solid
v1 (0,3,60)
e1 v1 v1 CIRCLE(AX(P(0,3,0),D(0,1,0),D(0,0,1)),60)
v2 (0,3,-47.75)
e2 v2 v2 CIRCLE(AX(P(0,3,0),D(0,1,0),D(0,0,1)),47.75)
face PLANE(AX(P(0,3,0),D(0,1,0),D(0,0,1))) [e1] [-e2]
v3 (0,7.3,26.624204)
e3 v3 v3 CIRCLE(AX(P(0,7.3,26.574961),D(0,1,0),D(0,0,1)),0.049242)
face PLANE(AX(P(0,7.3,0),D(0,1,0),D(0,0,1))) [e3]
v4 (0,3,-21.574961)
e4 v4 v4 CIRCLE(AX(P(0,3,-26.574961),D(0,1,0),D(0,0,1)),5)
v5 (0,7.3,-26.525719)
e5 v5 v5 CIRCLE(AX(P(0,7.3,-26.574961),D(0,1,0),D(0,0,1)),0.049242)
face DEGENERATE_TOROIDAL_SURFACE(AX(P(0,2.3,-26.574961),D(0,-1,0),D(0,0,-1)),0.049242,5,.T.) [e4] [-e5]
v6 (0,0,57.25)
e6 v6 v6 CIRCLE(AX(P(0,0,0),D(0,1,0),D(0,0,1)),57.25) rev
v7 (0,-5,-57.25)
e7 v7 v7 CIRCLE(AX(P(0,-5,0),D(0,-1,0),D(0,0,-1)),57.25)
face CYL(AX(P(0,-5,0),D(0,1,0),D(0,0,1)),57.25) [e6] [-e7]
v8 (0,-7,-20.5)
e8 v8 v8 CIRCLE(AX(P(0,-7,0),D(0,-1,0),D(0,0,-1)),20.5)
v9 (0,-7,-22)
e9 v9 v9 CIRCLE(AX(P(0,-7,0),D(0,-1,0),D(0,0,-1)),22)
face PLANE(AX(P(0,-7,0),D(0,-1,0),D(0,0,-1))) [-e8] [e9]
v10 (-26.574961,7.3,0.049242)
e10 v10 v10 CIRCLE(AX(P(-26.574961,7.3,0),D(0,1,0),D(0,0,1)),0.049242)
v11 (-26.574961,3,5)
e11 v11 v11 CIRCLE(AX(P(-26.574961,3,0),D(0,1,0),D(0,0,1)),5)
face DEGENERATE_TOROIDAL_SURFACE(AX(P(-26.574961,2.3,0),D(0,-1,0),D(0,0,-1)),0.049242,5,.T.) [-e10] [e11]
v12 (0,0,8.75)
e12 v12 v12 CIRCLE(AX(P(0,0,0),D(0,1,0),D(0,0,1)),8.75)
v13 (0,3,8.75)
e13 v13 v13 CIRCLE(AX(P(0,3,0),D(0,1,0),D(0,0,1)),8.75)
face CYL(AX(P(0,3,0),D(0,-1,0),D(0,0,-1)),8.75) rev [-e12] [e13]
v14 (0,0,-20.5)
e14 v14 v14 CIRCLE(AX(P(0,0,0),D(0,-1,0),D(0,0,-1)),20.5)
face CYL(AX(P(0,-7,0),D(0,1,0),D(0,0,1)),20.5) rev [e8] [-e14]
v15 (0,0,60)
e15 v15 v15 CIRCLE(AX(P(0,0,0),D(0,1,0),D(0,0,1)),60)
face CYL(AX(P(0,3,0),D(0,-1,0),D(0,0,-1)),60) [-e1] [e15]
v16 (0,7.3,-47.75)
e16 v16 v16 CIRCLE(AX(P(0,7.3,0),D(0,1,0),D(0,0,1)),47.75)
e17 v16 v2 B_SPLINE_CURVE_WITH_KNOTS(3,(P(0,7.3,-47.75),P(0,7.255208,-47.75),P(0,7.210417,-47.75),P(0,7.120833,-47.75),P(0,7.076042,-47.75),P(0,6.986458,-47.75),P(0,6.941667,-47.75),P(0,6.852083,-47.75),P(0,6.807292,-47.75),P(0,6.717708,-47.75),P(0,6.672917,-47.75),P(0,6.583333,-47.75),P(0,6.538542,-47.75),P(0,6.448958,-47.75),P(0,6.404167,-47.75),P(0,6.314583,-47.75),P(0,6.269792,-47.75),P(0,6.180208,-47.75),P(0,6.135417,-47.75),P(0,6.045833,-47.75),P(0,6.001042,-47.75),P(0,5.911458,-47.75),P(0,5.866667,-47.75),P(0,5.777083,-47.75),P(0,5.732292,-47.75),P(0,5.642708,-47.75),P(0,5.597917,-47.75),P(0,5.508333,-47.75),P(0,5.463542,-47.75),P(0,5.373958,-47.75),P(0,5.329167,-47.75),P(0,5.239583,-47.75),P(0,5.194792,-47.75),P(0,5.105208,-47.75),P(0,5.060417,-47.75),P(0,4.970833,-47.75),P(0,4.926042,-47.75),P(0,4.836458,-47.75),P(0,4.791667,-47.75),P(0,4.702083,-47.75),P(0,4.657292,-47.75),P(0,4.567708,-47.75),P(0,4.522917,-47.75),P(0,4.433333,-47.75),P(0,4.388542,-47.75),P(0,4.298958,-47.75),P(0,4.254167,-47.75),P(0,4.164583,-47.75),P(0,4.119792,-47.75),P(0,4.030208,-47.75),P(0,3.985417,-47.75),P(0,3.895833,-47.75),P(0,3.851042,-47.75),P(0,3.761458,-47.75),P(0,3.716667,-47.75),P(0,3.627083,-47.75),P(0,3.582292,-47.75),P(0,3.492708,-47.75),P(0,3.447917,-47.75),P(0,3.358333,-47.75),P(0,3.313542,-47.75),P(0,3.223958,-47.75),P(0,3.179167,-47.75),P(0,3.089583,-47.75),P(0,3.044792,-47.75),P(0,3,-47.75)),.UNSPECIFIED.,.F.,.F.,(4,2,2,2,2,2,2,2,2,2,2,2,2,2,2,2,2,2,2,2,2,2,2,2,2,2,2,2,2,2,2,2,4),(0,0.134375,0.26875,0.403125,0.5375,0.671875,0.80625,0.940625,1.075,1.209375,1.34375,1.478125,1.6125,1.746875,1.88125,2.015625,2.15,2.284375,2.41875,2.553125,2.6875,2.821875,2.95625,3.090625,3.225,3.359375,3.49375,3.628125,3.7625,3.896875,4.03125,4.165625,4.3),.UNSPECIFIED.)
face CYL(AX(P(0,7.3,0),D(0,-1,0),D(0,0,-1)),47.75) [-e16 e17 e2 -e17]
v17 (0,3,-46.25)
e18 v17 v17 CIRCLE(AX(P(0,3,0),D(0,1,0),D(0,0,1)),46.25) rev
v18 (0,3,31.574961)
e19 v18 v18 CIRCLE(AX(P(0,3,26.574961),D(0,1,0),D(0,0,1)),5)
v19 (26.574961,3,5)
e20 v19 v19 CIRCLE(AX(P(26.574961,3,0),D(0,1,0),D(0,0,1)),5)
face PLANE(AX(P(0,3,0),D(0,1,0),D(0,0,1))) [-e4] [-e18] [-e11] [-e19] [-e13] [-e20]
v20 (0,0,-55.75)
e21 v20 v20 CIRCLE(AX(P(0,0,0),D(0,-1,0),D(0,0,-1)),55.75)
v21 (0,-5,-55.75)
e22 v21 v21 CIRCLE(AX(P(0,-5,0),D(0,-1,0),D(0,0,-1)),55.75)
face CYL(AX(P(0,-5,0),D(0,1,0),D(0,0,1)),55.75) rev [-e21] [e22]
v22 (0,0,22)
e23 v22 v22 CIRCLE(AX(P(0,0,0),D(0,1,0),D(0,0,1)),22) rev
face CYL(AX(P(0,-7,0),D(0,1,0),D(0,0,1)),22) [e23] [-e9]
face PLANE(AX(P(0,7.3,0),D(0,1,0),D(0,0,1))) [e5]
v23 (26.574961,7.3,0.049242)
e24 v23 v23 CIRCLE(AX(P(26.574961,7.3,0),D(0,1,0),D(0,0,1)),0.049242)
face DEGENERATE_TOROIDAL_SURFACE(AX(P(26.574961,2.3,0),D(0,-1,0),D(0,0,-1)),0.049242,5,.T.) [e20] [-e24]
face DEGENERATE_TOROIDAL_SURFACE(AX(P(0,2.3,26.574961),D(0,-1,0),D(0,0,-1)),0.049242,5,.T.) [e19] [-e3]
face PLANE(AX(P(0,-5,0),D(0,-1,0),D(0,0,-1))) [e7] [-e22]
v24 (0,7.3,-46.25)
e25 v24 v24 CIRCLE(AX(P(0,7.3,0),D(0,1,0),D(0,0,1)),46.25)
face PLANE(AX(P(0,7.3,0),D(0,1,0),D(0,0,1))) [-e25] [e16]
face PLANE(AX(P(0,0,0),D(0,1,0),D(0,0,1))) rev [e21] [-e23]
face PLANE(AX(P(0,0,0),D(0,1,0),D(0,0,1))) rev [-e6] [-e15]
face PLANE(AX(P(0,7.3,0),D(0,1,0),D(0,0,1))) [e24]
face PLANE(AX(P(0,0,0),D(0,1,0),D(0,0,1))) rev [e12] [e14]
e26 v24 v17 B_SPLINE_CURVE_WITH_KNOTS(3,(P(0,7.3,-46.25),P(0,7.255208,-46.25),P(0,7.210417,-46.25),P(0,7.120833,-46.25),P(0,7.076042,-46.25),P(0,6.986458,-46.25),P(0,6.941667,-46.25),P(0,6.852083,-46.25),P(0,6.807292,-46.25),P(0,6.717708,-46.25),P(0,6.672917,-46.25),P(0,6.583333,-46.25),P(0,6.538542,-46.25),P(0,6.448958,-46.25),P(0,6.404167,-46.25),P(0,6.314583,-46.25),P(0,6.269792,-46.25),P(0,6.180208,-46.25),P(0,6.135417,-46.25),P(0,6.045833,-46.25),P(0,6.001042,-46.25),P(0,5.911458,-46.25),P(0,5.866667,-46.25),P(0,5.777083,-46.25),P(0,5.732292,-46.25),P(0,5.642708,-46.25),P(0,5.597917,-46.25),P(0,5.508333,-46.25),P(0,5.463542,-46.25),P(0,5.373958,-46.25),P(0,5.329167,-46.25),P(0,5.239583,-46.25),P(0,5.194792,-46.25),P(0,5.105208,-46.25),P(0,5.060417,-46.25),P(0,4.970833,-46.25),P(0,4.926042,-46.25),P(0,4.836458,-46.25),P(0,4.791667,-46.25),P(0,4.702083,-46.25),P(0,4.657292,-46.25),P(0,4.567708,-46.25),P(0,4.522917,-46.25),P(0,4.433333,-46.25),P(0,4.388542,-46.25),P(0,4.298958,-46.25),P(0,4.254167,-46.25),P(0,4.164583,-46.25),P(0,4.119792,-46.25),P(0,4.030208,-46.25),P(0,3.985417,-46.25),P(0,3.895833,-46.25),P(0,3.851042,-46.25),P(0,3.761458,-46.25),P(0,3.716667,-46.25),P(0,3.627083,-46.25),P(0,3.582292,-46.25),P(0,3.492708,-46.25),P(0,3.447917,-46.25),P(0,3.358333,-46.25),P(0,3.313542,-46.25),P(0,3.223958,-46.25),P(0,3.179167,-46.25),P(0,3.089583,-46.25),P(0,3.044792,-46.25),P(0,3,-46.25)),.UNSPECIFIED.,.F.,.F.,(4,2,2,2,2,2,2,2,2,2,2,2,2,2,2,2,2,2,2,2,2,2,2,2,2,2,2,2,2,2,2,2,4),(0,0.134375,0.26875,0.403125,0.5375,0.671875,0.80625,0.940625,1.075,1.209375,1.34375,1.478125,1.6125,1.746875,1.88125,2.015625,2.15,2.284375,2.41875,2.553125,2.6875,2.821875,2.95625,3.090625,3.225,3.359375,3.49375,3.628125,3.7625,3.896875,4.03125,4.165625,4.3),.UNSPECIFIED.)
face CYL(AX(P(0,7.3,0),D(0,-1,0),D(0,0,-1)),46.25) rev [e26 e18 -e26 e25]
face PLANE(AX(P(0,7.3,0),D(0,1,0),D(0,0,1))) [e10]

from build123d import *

# Parameters (mm, degrees)
SKETCH3_R           = 60
SKETCH3_R_2         = 8.75
BOSS_EXTRUDE1_DEPTH = 3
SKETCH4_R           = 57.25
SKETCH4_R_2         = 55.75
BOSS_EXTRUDE2_DEPTH = 5
SKETCH5_R           = 22
SKETCH5_R_2         = 20.5
BOSS_EXTRUDE3_DEPTH = 7
SKETCH6_R           = 47.75
SKETCH6_R_2         = 46.25
BOSS_EXTRUDE4_DEPTH = 4.3
SKETCH10_R          = 5
BOSS_EXTRUDE5_DEPTH = 4.3
FILLET2_R           = 5


with BuildPart() as part:
    # Sketch3 → Boss-Extrude1 (new body)
    with BuildSketch(Plane(origin=(0, 0, 0), x_dir=(1, 0, 0), z_dir=(0, 1, 0))):
        with Locations(Location((0, 0, 0), (0, 0, 270))):
            Circle(SKETCH3_R)
        with Locations(Location((0, 0, 0), (0, 0, 270))):
            Circle(SKETCH3_R_2, mode=Mode.SUBTRACT)
    extrude(amount=BOSS_EXTRUDE1_DEPTH)

    # Sketch4 → Boss-Extrude2 (add)
    with BuildSketch(Plane.XZ):
        with Locations(Location((0, 0, 0), (0, 0, 90))):
            Circle(SKETCH4_R)
        with Locations(Location((0, 0, 0), (0, 0, 270))):
            Circle(SKETCH4_R_2, mode=Mode.SUBTRACT)
    extrude(amount=BOSS_EXTRUDE2_DEPTH)

    # Sketch5 → Boss-Extrude3 (add)
    with BuildSketch(Plane.XZ):
        with Locations(Location((0, 0, 0), (0, 0, 90))):
            Circle(SKETCH5_R)
        with Locations(Location((0, 0, 0), (0, 0, 270))):
            Circle(SKETCH5_R_2, mode=Mode.SUBTRACT)
    extrude(amount=BOSS_EXTRUDE3_DEPTH)

    # Sketch6 → Boss-Extrude4 (add)
    with BuildSketch(Plane(origin=(0, 3, 0), x_dir=(1, 0, 0), z_dir=(0, 1, 0))):
        with Locations(Location((0, 0, 0), (0, 0, 90))):
            Circle(SKETCH6_R)
        with Locations(Location((0, 0, 0), (0, 0, 90))):
            Circle(SKETCH6_R_2, mode=Mode.SUBTRACT)
    extrude(amount=BOSS_EXTRUDE4_DEPTH)

    # Sketch10 → Boss-Extrude5 (add)
    with BuildSketch(Plane(origin=(0, 3, 0), x_dir=(1, 0, 0), z_dir=(0, 1, 0))):
        with Locations(Location((0, 26.574961269, 0), (0, 0, 270))):
            Circle(SKETCH10_R)
        with Locations(Location((26.574961269, 0, 0), (0, 0, 270))):
            Circle(SKETCH10_R)
        with Locations(Location((0, -26.574961269, 0), (0, 0, 270))):
            Circle(SKETCH10_R)
        with Locations(Location((-26.574961269, 0, 0), (0, 0, 270))):
            Circle(SKETCH10_R)
    extrude(amount=BOSS_EXTRUDE5_DEPTH)

    # Fillet2
    # the kernel refuses this fillet: 5 mm, written as the material it takes off along each edge
    with BuildSketch(Plane(origin=(0, 7.3, -26.574961269), x_dir=(0, 0, 1), z_dir=(-1, 0, 0))) as fillet2_piece_1:
        with BuildLine():
            CenterArc((0.049242482, -5), FILLET2_R, 8.047846247, 81.952153753)
            Line((0.049242482, 0), (0.049242482, 0.1))
            Line((0.049242482, 0.1), (5, 0.1))
            Line((5, 0.1), (5.1, 0))
            ThreePointArc((5.1, 0), (5.1, -2.15), (5.09901515, -4.286))
            Line((5.09901515, -4.286), (5, -4.3))
        make_face()
    revolve(axis=Axis((0, 7.3, -26.574961269), (0, 1, 0)), mode=Mode.SUBTRACT)
    with BuildSketch(Plane(origin=(26.574961269, 7.3, 0), x_dir=(0, 0, 1), z_dir=(-1, 0, 0))) as fillet2_piece_2:
        with BuildLine():
            CenterArc((0.049242482, -5), FILLET2_R, 8.047846247, 81.952153753)
            Line((0.049242482, 0), (0.049242482, 0.1))
            Line((0.049242482, 0.1), (5, 0.1))
            Line((5, 0.1), (5.1, 0))
            ThreePointArc((5.1, 0), (5.1, -2.15), (5.09901515, -4.286))
            Line((5.09901515, -4.286), (5, -4.3))
        make_face()
    revolve(axis=Axis((26.574961269, 7.3, 0), (0, 1, 0)), mode=Mode.SUBTRACT)
    with BuildSketch(Plane(origin=(0, 7.3, 26.574961269), x_dir=(0, 0, 1), z_dir=(-1, 0, 0))) as fillet2_piece_3:
        with BuildLine():
            CenterArc((0.049242482, -5), FILLET2_R, 8.047846247, 81.952153753)
            Line((0.049242482, 0), (0.049242482, 0.1))
            Line((0.049242482, 0.1), (5, 0.1))
            Line((5, 0.1), (5.1, 0))
            ThreePointArc((5.1, 0), (5.1, -2.15), (5.09901515, -4.286))
            Line((5.09901515, -4.286), (5, -4.3))
        make_face()
    revolve(axis=Axis((0, 7.3, 26.574961269), (0, 1, 0)), mode=Mode.SUBTRACT)
    with BuildSketch(Plane(origin=(-26.574961269, 7.3, 0), x_dir=(0, 0, 1), z_dir=(-1, 0, 0))) as fillet2_piece_4:
        with BuildLine():
            CenterArc((0.049242482, -5), FILLET2_R, 8.047846247, 81.952153753)
            Line((0.049242482, 0), (0.049242482, 0.1))
            Line((0.049242482, 0.1), (5, 0.1))
            Line((5, 0.1), (5.1, 0))
            ThreePointArc((5.1, 0), (5.1, -2.15), (5.09901515, -4.286))
            Line((5.09901515, -4.286), (5, -4.3))
        make_face()
    revolve(axis=Axis((-26.574961269, 7.3, 0), (0, 1, 0)), mode=Mode.SUBTRACT)


solid = part.part
